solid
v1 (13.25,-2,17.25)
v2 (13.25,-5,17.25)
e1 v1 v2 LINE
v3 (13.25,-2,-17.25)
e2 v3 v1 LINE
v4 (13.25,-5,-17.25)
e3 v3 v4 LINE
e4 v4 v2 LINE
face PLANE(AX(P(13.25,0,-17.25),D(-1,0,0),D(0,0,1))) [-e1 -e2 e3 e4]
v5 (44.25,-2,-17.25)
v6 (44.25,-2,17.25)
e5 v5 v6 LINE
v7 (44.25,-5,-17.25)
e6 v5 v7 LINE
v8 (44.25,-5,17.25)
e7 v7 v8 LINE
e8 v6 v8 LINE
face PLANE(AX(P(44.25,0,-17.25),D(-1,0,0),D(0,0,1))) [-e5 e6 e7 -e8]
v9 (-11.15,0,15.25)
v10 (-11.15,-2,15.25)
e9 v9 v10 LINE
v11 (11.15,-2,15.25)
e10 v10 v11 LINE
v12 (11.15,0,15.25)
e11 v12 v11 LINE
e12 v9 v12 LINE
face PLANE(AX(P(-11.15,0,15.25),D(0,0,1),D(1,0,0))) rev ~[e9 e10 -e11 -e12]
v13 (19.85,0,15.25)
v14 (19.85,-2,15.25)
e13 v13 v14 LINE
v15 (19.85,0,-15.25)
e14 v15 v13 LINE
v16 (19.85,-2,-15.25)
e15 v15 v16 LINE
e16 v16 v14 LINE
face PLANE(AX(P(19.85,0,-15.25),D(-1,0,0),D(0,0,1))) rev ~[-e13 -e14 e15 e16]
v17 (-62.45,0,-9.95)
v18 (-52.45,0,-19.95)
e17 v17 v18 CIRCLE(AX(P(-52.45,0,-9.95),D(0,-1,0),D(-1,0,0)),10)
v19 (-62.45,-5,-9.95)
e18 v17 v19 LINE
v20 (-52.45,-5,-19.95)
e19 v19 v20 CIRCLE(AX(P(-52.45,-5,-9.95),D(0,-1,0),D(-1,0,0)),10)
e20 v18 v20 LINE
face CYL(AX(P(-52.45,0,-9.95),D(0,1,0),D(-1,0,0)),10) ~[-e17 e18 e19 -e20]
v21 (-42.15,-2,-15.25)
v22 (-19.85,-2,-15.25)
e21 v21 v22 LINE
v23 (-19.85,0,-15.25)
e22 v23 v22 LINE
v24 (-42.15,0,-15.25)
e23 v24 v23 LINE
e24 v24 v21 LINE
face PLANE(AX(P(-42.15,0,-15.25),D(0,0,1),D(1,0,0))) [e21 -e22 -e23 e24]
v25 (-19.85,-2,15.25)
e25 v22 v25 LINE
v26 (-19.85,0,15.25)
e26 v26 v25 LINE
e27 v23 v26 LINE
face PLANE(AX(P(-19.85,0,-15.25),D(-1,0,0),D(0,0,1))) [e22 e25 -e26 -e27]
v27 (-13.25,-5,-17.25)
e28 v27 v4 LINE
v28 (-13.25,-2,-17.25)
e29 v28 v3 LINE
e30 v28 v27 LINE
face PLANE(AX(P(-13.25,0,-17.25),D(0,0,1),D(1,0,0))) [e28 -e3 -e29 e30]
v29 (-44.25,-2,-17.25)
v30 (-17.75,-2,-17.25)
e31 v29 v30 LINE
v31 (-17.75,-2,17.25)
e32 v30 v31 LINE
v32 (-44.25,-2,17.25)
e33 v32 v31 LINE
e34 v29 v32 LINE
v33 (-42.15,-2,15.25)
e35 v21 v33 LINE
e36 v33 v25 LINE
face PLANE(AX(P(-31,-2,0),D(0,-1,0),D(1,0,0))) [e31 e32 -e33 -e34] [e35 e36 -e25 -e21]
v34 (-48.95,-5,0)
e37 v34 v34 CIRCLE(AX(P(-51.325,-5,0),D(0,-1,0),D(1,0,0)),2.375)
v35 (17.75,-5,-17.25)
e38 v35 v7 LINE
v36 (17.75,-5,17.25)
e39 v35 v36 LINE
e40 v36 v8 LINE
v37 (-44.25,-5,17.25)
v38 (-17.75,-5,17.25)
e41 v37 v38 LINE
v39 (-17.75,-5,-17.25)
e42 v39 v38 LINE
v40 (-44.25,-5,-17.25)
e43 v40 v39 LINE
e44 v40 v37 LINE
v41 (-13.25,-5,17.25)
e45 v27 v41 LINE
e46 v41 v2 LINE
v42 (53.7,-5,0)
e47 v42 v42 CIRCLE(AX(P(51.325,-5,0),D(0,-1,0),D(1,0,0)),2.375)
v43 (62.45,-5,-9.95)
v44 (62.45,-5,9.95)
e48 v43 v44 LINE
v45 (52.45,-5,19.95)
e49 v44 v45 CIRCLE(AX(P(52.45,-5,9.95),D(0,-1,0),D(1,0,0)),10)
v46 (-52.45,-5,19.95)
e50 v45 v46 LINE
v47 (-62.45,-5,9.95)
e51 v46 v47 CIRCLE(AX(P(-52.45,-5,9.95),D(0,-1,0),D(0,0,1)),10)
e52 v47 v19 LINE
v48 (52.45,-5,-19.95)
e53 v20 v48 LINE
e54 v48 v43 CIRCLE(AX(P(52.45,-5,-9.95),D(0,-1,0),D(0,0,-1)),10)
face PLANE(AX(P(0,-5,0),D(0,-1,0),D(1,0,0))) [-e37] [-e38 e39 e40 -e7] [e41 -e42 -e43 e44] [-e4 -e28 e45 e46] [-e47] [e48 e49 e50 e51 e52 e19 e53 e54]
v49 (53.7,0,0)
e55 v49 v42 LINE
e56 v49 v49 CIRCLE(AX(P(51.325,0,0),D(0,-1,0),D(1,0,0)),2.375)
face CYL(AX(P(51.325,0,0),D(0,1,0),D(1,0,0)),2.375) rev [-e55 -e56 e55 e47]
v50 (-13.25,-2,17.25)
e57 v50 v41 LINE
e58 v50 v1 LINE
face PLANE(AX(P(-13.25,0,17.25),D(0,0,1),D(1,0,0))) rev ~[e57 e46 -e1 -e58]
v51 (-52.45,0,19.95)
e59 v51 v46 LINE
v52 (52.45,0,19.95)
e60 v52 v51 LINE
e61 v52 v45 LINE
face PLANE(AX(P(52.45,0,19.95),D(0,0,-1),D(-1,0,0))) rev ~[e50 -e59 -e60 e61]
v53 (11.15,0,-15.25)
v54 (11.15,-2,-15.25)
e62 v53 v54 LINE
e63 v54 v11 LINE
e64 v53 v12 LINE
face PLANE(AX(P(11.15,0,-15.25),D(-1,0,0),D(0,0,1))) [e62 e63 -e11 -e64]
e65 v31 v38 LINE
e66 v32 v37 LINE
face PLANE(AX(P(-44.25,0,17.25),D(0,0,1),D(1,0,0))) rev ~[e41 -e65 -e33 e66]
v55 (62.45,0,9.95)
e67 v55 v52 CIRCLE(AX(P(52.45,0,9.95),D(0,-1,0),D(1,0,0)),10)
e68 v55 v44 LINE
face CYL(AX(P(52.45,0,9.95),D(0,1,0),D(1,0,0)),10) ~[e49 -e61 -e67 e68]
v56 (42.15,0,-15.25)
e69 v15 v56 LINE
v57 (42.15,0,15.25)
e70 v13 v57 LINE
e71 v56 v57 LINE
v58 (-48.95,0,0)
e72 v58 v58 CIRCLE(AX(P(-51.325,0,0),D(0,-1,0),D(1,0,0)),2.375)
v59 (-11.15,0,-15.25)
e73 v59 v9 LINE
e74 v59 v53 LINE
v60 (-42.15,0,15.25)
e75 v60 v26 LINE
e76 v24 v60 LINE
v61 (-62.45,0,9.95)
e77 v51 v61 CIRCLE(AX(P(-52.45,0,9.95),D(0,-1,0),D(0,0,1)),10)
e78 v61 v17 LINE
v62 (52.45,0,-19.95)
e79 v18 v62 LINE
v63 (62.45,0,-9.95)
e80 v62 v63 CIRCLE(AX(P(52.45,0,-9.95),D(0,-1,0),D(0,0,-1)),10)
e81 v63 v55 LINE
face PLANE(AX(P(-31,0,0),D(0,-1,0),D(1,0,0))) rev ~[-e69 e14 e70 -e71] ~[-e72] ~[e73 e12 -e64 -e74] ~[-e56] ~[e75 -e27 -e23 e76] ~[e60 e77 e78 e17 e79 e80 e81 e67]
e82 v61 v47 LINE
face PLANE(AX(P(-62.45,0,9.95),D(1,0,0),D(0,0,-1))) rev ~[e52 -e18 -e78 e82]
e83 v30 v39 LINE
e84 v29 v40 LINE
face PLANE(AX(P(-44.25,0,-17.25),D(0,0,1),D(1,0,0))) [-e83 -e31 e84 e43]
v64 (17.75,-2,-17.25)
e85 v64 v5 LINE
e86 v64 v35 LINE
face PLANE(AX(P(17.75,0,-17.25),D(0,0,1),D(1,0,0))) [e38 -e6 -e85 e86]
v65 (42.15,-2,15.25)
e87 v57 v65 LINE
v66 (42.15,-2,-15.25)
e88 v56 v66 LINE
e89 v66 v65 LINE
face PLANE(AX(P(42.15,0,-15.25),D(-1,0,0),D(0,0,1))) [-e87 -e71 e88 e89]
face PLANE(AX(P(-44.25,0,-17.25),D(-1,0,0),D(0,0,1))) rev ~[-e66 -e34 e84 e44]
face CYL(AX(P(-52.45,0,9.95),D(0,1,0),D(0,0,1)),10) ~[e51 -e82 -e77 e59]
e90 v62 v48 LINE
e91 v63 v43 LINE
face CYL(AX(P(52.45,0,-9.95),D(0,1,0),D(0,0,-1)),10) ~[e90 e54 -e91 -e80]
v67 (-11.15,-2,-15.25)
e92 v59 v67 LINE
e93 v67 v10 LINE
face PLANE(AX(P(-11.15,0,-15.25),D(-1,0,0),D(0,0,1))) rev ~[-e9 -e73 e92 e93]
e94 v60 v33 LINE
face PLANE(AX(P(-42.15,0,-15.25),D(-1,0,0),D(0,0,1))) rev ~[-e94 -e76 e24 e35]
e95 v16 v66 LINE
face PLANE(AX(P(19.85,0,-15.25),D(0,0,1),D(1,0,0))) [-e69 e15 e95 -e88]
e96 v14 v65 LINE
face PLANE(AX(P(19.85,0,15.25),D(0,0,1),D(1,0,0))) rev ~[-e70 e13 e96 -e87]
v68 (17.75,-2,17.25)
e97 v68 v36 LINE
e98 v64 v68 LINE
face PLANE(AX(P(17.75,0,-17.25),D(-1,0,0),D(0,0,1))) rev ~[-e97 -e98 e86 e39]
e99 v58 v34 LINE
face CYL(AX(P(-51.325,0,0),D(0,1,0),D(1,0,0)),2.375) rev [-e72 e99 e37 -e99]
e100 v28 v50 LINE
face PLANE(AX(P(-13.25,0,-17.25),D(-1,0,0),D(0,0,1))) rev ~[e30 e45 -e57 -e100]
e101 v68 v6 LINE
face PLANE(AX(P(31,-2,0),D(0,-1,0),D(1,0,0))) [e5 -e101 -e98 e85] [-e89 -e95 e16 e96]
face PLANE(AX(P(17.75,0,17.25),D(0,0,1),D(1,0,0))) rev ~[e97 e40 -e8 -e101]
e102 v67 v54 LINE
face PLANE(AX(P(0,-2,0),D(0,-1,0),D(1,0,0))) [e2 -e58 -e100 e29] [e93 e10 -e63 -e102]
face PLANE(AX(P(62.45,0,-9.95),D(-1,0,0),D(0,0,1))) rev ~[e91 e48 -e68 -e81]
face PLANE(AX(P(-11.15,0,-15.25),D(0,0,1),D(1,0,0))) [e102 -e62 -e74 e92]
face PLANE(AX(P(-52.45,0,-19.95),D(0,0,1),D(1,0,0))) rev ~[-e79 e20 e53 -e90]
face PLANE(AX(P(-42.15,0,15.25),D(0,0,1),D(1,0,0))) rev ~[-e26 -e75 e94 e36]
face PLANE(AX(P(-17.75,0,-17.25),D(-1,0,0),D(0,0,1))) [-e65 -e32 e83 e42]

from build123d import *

# Parameters (mm, degrees)
F0_R     = 2.375
F0_W     = 26.5
F0_H     = 34.5
F1_DEPTH = 5
F0_W_2   = 22.3
F0_H_2   = 30.5
F2_DEPTH = 2


# Not quite as in the source:
# - a feature of the source that left no trace in its solid (it failed there, or was rolled back) is left out


with BuildPart() as f1:
    # F0 (on Front) → F1 (new body)
    with BuildSketch(Plane.XZ):
        with BuildLine():
            Line((52.45, 19.95), (-52.45, 19.95))
            ThreePointArc((-52.45, 19.95), (-59.5210678119, 17.0210678119), (-62.45, 9.95))
            Line((-62.45, 9.95), (-62.45, -9.95))
            ThreePointArc((-62.45, -9.95), (-59.5210678119, -17.0210678119), (-52.45, -19.95))
            Line((-52.45, -19.95), (52.45, -19.95))
            ThreePointArc((52.45, -19.95), (59.5210678119, -17.0210678119), (62.45, -9.95))
            Line((62.45, -9.95), (62.45, 9.95))
            ThreePointArc((62.45, 9.95), (59.5210678119, 17.0210678119), (52.45, 19.95))
        make_face()
        with Locations((-51.325, 0)):
            Circle(F0_R, mode=Mode.SUBTRACT)
        with Locations((-31, 0)):
            Rectangle(F0_W, F0_H, mode=Mode.SUBTRACT)
        Rectangle(F0_W, F0_H, mode=Mode.SUBTRACT)
        with Locations((31, 0)):
            Rectangle(F0_W, F0_H, mode=Mode.SUBTRACT)
        with Locations((51.325, 0)):
            Circle(F0_R, mode=Mode.SUBTRACT)
    extrude(amount=F1_DEPTH)

    # F0 (on Front) → F2 (join)
    with BuildSketch(Plane.XZ):
        with Locations((-31, 0)):
            Rectangle(F0_W, F0_H)
        with Locations((-31, 0)):
            Rectangle(F0_W_2, F0_H_2, mode=Mode.SUBTRACT)
        Rectangle(F0_W, F0_H)
        Rectangle(F0_W_2, F0_H_2, mode=Mode.SUBTRACT)
        with Locations((31, 0)):
            Rectangle(F0_W, F0_H)
        with Locations((31, 0)):
            Rectangle(F0_W_2, F0_H_2, mode=Mode.SUBTRACT)
    extrude(amount=F2_DEPTH)


solid = f1.part
